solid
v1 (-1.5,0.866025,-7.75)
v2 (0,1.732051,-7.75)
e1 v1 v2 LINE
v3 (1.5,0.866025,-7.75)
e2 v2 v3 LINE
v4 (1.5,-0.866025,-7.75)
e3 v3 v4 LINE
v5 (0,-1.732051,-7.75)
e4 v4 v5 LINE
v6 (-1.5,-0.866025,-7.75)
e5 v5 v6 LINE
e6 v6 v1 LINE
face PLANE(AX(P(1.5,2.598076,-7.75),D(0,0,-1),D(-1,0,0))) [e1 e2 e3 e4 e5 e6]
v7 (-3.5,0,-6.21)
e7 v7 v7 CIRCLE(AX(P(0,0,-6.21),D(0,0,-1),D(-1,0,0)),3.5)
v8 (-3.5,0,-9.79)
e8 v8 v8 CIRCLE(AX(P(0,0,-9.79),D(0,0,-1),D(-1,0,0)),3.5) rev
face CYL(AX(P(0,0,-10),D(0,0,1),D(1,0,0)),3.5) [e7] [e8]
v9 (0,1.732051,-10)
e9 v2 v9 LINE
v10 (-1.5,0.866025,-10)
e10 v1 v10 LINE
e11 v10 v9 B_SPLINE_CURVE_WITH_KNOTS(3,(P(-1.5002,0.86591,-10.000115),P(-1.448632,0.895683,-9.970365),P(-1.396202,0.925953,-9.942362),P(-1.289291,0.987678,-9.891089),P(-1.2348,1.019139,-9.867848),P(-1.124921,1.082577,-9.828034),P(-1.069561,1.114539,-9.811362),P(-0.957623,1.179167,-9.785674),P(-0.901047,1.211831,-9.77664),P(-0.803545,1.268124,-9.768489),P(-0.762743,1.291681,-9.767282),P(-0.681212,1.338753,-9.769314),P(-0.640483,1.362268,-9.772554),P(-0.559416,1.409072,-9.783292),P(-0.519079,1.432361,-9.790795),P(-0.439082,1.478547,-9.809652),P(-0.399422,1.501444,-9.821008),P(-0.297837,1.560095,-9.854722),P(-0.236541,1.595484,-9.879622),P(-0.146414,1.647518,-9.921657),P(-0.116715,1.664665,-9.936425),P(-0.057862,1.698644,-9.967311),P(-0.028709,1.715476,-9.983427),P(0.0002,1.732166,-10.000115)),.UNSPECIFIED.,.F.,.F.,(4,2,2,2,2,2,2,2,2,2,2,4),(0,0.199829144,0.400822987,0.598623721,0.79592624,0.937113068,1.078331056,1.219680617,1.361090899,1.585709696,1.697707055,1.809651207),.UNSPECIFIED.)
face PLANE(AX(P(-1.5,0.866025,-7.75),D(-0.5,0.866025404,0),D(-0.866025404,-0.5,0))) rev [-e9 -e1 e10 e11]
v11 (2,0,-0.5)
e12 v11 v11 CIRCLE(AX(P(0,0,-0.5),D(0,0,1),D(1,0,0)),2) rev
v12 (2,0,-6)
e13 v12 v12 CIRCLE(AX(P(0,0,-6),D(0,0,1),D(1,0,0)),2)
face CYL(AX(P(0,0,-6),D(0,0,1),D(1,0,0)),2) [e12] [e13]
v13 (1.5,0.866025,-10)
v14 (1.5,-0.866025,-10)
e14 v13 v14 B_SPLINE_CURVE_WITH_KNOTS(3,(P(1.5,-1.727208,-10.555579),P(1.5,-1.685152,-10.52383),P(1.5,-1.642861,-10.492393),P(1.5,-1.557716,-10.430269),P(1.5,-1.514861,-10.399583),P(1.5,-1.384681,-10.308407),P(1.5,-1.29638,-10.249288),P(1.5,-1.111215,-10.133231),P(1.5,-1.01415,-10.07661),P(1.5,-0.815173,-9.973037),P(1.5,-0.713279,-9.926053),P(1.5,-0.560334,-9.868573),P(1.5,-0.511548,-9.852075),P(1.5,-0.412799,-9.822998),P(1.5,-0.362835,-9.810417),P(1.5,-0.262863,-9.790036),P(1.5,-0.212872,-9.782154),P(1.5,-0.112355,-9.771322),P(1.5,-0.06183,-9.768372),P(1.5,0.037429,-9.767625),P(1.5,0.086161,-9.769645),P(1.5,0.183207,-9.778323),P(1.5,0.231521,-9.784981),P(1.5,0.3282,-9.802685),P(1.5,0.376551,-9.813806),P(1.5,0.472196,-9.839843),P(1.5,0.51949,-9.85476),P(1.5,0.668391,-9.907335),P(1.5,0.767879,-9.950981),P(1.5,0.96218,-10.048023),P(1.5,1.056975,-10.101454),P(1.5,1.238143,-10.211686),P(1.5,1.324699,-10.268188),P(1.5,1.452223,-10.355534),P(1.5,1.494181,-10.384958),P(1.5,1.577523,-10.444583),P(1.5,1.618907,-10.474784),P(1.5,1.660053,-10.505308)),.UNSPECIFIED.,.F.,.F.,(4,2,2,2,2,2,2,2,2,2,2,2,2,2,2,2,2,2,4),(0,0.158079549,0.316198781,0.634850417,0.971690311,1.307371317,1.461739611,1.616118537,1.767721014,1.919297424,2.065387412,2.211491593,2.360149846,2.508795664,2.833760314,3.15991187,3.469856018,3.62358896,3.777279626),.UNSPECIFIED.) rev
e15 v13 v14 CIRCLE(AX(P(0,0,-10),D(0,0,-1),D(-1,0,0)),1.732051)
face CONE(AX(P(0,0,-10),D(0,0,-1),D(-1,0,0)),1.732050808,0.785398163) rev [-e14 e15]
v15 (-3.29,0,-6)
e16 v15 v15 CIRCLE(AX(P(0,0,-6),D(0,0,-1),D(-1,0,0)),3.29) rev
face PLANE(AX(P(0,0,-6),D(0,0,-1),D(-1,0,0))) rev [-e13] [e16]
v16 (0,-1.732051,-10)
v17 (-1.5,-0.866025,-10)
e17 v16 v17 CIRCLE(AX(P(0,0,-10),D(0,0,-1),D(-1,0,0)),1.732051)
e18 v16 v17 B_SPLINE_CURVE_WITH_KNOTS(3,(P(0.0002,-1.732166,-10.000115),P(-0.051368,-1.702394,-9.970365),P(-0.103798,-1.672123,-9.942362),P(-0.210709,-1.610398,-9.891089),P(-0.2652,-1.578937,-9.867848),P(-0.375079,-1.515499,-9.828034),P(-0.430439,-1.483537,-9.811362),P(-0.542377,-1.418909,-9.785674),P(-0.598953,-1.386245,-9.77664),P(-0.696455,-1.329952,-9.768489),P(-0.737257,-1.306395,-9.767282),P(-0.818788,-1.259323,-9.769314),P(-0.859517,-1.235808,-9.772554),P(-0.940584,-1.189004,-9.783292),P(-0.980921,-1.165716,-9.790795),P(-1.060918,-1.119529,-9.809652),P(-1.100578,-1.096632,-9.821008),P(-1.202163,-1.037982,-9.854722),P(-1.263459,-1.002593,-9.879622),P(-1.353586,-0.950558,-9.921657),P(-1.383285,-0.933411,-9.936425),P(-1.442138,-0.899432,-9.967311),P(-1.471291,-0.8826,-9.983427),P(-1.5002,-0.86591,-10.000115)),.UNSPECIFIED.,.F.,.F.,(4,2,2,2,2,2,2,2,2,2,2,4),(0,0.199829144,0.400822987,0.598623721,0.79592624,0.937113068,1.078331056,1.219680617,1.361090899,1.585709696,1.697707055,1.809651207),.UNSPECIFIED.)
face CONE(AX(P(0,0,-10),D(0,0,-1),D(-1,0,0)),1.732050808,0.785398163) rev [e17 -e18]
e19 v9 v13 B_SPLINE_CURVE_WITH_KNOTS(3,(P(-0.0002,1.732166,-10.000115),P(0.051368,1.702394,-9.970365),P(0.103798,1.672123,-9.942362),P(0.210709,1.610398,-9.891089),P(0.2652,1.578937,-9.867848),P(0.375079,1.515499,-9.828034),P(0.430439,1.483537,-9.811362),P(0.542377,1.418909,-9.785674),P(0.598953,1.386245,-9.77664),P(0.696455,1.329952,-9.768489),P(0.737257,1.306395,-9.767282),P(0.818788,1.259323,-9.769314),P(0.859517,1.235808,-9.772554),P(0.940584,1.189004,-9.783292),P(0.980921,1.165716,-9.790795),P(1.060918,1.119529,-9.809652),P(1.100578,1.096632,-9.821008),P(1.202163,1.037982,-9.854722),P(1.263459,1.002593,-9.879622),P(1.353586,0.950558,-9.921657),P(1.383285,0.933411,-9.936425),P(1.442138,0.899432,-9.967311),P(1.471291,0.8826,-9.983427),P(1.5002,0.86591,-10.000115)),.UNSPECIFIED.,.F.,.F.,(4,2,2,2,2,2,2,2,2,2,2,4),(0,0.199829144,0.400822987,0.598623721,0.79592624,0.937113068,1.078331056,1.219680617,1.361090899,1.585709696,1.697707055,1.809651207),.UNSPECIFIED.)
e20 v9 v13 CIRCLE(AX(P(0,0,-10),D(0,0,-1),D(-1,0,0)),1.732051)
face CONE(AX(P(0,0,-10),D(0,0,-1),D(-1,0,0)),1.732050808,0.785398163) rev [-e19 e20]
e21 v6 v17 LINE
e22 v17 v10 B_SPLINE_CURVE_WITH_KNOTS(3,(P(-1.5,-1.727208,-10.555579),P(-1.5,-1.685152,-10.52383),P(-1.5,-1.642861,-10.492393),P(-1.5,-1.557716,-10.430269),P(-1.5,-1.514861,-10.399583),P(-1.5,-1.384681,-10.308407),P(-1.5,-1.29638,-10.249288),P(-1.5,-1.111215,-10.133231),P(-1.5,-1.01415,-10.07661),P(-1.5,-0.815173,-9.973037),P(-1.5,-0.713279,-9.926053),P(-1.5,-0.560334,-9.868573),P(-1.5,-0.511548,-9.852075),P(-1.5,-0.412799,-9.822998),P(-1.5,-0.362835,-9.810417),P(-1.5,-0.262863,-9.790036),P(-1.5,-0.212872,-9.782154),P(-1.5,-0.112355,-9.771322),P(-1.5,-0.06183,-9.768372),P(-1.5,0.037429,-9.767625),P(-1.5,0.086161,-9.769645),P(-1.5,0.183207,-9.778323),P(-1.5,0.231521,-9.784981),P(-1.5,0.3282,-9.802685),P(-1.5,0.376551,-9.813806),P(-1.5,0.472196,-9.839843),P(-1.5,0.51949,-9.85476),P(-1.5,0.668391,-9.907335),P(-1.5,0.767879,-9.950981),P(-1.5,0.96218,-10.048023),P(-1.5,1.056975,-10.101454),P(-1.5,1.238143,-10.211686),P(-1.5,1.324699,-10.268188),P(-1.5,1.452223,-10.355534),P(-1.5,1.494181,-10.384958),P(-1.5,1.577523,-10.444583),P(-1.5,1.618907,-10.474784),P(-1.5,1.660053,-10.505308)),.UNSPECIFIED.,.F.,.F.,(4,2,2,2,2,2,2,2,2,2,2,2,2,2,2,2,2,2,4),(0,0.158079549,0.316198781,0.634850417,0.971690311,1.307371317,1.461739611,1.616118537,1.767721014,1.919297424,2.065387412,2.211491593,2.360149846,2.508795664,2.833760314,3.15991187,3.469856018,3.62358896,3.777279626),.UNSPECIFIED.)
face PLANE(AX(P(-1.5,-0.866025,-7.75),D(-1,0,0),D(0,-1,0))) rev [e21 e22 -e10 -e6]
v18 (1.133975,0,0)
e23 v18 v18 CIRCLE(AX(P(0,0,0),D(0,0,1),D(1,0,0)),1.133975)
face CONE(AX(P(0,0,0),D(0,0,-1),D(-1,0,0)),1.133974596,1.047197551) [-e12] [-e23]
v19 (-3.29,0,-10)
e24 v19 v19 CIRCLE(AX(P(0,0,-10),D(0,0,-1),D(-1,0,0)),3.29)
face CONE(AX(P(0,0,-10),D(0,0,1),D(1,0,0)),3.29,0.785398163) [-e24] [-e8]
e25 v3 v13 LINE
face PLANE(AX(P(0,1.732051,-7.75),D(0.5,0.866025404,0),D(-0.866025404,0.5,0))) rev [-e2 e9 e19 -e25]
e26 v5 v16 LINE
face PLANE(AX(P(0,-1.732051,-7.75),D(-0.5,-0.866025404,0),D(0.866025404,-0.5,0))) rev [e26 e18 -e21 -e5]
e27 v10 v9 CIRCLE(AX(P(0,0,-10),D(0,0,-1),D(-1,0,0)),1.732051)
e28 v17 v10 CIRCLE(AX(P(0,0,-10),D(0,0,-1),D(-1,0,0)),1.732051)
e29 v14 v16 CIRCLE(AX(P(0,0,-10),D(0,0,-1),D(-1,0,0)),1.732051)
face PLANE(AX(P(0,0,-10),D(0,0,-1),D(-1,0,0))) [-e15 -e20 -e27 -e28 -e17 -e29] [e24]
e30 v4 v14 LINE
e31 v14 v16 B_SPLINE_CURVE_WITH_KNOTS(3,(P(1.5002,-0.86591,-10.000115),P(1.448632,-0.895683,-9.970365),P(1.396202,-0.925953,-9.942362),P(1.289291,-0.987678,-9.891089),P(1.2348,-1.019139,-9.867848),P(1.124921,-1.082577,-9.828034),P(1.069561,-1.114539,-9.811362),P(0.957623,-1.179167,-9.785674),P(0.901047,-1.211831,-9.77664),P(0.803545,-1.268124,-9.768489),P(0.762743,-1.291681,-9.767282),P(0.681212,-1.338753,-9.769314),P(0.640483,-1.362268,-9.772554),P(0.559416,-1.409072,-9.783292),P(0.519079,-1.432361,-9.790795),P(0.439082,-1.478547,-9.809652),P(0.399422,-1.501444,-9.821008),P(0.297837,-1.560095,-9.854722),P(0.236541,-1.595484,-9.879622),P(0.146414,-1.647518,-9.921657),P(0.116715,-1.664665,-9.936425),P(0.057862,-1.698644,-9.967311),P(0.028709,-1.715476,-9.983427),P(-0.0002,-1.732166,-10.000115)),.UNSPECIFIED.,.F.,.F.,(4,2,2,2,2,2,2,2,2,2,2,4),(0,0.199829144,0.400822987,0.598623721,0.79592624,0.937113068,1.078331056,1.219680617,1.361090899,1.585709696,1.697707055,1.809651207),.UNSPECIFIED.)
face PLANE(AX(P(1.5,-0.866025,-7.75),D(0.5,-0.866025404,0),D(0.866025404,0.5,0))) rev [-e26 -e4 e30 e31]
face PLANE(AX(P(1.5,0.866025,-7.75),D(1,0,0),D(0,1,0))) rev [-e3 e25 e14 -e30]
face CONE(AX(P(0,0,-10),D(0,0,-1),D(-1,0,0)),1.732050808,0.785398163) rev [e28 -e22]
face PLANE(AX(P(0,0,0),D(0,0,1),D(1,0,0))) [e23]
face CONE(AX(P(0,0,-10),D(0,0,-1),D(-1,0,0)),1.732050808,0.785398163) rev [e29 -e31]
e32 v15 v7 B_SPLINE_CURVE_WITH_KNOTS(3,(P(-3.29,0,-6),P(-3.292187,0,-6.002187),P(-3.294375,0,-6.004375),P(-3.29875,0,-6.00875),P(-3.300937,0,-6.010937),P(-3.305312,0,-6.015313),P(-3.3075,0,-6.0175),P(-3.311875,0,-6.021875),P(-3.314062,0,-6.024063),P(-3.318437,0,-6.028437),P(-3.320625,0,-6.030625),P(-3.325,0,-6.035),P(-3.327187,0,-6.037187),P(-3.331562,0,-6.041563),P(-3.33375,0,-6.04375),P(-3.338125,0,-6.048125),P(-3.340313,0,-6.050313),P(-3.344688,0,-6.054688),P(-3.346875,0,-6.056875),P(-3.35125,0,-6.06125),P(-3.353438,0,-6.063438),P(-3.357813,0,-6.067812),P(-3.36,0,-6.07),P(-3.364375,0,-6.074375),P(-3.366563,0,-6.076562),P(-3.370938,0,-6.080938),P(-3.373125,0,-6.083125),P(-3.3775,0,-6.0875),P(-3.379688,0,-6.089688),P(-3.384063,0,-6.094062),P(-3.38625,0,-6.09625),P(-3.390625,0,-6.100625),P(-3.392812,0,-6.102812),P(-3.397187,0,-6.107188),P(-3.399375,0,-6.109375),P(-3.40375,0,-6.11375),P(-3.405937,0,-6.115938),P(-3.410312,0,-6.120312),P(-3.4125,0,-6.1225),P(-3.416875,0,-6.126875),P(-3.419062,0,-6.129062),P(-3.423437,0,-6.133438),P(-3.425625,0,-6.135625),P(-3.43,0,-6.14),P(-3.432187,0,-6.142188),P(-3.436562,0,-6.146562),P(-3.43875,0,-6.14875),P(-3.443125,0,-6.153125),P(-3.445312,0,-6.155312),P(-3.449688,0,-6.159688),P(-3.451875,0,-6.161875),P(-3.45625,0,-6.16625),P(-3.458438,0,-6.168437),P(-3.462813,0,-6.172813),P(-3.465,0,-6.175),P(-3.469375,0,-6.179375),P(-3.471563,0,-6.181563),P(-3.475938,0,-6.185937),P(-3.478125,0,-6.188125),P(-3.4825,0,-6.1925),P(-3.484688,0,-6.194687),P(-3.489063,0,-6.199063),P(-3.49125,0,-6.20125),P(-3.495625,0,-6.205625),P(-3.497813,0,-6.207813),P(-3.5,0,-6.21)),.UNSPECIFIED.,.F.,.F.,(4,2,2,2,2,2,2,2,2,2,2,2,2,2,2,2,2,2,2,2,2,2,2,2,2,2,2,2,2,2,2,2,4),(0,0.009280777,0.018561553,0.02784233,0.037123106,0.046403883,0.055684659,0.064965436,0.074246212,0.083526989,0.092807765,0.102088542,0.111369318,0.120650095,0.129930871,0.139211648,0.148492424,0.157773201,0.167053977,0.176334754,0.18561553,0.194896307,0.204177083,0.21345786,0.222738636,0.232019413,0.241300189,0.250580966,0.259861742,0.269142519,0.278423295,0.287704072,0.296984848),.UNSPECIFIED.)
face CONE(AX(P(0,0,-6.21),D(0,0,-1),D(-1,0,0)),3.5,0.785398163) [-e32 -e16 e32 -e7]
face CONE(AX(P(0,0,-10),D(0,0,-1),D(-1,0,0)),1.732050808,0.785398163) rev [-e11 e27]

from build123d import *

# Parameters (mm, degrees)
SKETCH1_R           = 2
EXTRUDE1_DEPTH      = 6
CUT_SWEEP1_PITCH    = 0.7
SKETCH6_R           = 3.5
EXTRUDE2_DEPTH      = 4
CUT_EXTRUDE1_DEPTH  = 2.25
CHAMFER1_SIZE       = 0.21
SKETCH12_R          = 2
BOSS_EXTRUDE1_DEPTH = 6
CHAMFER2_SIZE       = 0.5
CHAMFER2_SIZE_2     = 0.866025404


with BuildPart() as part:
    # Sketch1 → Extrude1 (new body)
    with BuildSketch(Plane.XY):
        Circle(SKETCH1_R)
    extrude(amount=-EXTRUDE1_DEPTH)

    # Cut-Sweep1: the profile of Sketch3 profile screwed along a right-hand helix of 9.571429 turns, 6 arcs to a turn; built about Z, then put on its axis
    cut_sweep1_z = Axis((0, 0, 0), (0, 0, 1))
    cut_sweep1_corners = [(2.0003, 0, -0.612673205), (1.545336663, 0, -0.35), (1.545336663, 0, -0.2625), (2.0003, 0, 0.000173205)]
    with BuildLine(mode=Mode.PRIVATE) as cut_sweep1_profile:
        Line(cut_sweep1_corners[0], cut_sweep1_corners[1])
        Line(cut_sweep1_corners[1], cut_sweep1_corners[2])
        Line(cut_sweep1_corners[2], cut_sweep1_corners[3])
        Line(cut_sweep1_corners[3], cut_sweep1_corners[0])
    cut_sweep1_cap = Face(cut_sweep1_profile.wire())
    cut_sweep1_turn_angles = [0, 30, 60, 90, 120, 150, 180, 210, 240, 270, 300, 330, 360]
    cut_sweep1_turn_weights = [1, 0.8660254037844387, 1, 0.8660254037844387, 1, 0.8660254037844387, 1, 0.8660254037844387, 1, 0.8660254037844387, 1, 0.8660254037844387, 1]
    cut_sweep1_turn_rails = [Edge.make_bspline([Vector(p[0], p[1], 0).rotate(cut_sweep1_z, cut_sweep1_turn_angles[k]) / cut_sweep1_turn_weights[k] + Vector(0, 0, p[2] + CUT_SWEEP1_PITCH * cut_sweep1_turn_angles[k] / 360) for k in range(13)], [0, 0, 0, 1, 1, 2, 2, 3, 3, 4, 4, 5, 5, 6, 6, 6], 2, cut_sweep1_turn_weights) for p in cut_sweep1_corners]
    cut_sweep1_turn_sides = [Face.make_surface_from_curves(cut_sweep1_turn_rails[p[0]], cut_sweep1_turn_rails[p[1]]) for p in [(0, 1), (1, 2), (2, 3), (3, 0)]]
    cut_sweep1_last_angles = [3240, 3270, 3300, 3330, 3360, 3390, 3420, 3432.857142857, 3445.714285714]
    cut_sweep1_last_weights = [1, 0.8660254037844387, 1, 0.8660254037844387, 1, 0.8660254037844387, 1, 0.9749279121818499, 1]
    cut_sweep1_last_rails = [Edge.make_bspline([Vector(p[0], p[1], 0).rotate(cut_sweep1_z, cut_sweep1_last_angles[k]) / cut_sweep1_last_weights[k] + Vector(0, 0, p[2] + CUT_SWEEP1_PITCH * cut_sweep1_last_angles[k] / 360) for k in range(9)], [0, 0, 0, 1, 1, 2, 2, 3, 3, 4, 4, 4], 2, cut_sweep1_last_weights) for p in cut_sweep1_corners]
    cut_sweep1_last_sides = [Face.make_surface_from_curves(cut_sweep1_last_rails[p[0]], cut_sweep1_last_rails[p[1]]) for p in [(0, 1), (1, 2), (2, 3), (3, 0)]]
    cut_sweep1 = Plane(origin=(0, 0, 0), x_dir=(0, 1, 0), z_dir=(0, 0, -1)) * Solid(Shell([*[p.moved(Location((0, 0, CUT_SWEEP1_PITCH * i))) for i in range(9) for p in cut_sweep1_turn_sides], *cut_sweep1_last_sides, cut_sweep1_cap, cut_sweep1_cap.rotate(cut_sweep1_z, 3445.714285714).moved(Location((0, 0, CUT_SWEEP1_PITCH * 3445.714285714 / 360)))]))
    add(cut_sweep1, mode=Mode.SUBTRACT)

    # Sketch4 → Cut-Revolve1 (revolve, cut)
    with BuildSketch(Plane(origin=(0, 0, 0), x_dir=(0, 0, -1), z_dir=(1, 0, 0)), mode=Mode.PRIVATE) as cut_revolve1_sk:
        Polygon((0.496211411, 2), (0, 1.291336663), (0, 2), align=None)
    revolve(cut_revolve1_sk.sketch.rotate(Axis((0, 0, 0), (0, 0, -1)), 271.401126896), axis=Axis((0, 0, 0), (0, 0, -1)), mode=Mode.SUBTRACT)

    # Sketch6 → Extrude2 (add)
    with BuildSketch(Plane(origin=(0, 0, -6), x_dir=(-1, 0, 0), z_dir=(0, 0, -1))):
        Circle(SKETCH6_R)
    extrude(amount=EXTRUDE2_DEPTH)

    # Sketch7 → Cut-Extrude1 (cut)
    with BuildSketch(Plane(origin=(0, 0, -10), x_dir=(-1, 0, 0), z_dir=(0, 0, -1))):
        Polygon((0, 1.732050808), (-1.5, 0.866025404), (-1.5, -0.866025404), (0, -1.732050808), (1.5, -0.866025404), (1.5, 0.866025404), align=None)
    extrude(amount=-CUT_EXTRUDE1_DEPTH, mode=Mode.SUBTRACT)

    # Cut-Extrude2 cone 1 section (through the dimple's axis) → Cut-Extrude2 (revolve, cut)
    with BuildSketch(Plane(origin=(0, 0, -10), x_dir=(0, 1, 0), z_dir=(1, 0, 0))):
        Polygon((0, 0), (1.732050808, 0), (0, 1.732050808), align=None)
    revolve(axis=Axis((0, 0, -10), (0, 0, 1)), mode=Mode.SUBTRACT)

    # Chamfer1
    chamfer1_edges = [part.edges().sort_by_distance(p)[0] for p in [
        (3.5, 0, -6),
        (3.5, 0, -10),
    ]]
    chamfer(chamfer1_edges, length=CHAMFER1_SIZE)

    # Sketch10 → Revolve1 (revolve)
    with BuildSketch(Plane(origin=(0, 0, 0), x_dir=(0, 0, -1), z_dir=(1, 0, 0)), mode=Mode.PRIVATE) as revolve1_sk:
        Polygon((6, 2), (6, 0), (4.996572875, 0), (5.825, 2), align=None)
    revolve(revolve1_sk.sketch.rotate(Axis((0, 0, -6), (0, 0, 1)), 270), axis=Axis((0, 0, -6), (0, 0, 1)))

    # Sketch12 → Boss-Extrude1 (add)
    with BuildSketch(Plane.XY):
        Circle(SKETCH12_R)
    extrude(amount=-BOSS_EXTRUDE1_DEPTH)

    # Chamfer2
    # the kernel refuses this chamfer: 0.866025404, 0.5 mm, written as the material it takes off along each edge
    with BuildSketch(Plane(origin=(0, 0, 0), x_dir=(1, 0, 0), z_dir=(0, -1, 0))) as chamfer2_piece_1:
        Polygon((2, -CHAMFER2_SIZE), (2 - CHAMFER2_SIZE_2, 0), (2, 0), align=None)
    revolve(axis=Axis((0, 0, 0), (0, 0, 1)), mode=Mode.SUBTRACT)


solid = part.part
